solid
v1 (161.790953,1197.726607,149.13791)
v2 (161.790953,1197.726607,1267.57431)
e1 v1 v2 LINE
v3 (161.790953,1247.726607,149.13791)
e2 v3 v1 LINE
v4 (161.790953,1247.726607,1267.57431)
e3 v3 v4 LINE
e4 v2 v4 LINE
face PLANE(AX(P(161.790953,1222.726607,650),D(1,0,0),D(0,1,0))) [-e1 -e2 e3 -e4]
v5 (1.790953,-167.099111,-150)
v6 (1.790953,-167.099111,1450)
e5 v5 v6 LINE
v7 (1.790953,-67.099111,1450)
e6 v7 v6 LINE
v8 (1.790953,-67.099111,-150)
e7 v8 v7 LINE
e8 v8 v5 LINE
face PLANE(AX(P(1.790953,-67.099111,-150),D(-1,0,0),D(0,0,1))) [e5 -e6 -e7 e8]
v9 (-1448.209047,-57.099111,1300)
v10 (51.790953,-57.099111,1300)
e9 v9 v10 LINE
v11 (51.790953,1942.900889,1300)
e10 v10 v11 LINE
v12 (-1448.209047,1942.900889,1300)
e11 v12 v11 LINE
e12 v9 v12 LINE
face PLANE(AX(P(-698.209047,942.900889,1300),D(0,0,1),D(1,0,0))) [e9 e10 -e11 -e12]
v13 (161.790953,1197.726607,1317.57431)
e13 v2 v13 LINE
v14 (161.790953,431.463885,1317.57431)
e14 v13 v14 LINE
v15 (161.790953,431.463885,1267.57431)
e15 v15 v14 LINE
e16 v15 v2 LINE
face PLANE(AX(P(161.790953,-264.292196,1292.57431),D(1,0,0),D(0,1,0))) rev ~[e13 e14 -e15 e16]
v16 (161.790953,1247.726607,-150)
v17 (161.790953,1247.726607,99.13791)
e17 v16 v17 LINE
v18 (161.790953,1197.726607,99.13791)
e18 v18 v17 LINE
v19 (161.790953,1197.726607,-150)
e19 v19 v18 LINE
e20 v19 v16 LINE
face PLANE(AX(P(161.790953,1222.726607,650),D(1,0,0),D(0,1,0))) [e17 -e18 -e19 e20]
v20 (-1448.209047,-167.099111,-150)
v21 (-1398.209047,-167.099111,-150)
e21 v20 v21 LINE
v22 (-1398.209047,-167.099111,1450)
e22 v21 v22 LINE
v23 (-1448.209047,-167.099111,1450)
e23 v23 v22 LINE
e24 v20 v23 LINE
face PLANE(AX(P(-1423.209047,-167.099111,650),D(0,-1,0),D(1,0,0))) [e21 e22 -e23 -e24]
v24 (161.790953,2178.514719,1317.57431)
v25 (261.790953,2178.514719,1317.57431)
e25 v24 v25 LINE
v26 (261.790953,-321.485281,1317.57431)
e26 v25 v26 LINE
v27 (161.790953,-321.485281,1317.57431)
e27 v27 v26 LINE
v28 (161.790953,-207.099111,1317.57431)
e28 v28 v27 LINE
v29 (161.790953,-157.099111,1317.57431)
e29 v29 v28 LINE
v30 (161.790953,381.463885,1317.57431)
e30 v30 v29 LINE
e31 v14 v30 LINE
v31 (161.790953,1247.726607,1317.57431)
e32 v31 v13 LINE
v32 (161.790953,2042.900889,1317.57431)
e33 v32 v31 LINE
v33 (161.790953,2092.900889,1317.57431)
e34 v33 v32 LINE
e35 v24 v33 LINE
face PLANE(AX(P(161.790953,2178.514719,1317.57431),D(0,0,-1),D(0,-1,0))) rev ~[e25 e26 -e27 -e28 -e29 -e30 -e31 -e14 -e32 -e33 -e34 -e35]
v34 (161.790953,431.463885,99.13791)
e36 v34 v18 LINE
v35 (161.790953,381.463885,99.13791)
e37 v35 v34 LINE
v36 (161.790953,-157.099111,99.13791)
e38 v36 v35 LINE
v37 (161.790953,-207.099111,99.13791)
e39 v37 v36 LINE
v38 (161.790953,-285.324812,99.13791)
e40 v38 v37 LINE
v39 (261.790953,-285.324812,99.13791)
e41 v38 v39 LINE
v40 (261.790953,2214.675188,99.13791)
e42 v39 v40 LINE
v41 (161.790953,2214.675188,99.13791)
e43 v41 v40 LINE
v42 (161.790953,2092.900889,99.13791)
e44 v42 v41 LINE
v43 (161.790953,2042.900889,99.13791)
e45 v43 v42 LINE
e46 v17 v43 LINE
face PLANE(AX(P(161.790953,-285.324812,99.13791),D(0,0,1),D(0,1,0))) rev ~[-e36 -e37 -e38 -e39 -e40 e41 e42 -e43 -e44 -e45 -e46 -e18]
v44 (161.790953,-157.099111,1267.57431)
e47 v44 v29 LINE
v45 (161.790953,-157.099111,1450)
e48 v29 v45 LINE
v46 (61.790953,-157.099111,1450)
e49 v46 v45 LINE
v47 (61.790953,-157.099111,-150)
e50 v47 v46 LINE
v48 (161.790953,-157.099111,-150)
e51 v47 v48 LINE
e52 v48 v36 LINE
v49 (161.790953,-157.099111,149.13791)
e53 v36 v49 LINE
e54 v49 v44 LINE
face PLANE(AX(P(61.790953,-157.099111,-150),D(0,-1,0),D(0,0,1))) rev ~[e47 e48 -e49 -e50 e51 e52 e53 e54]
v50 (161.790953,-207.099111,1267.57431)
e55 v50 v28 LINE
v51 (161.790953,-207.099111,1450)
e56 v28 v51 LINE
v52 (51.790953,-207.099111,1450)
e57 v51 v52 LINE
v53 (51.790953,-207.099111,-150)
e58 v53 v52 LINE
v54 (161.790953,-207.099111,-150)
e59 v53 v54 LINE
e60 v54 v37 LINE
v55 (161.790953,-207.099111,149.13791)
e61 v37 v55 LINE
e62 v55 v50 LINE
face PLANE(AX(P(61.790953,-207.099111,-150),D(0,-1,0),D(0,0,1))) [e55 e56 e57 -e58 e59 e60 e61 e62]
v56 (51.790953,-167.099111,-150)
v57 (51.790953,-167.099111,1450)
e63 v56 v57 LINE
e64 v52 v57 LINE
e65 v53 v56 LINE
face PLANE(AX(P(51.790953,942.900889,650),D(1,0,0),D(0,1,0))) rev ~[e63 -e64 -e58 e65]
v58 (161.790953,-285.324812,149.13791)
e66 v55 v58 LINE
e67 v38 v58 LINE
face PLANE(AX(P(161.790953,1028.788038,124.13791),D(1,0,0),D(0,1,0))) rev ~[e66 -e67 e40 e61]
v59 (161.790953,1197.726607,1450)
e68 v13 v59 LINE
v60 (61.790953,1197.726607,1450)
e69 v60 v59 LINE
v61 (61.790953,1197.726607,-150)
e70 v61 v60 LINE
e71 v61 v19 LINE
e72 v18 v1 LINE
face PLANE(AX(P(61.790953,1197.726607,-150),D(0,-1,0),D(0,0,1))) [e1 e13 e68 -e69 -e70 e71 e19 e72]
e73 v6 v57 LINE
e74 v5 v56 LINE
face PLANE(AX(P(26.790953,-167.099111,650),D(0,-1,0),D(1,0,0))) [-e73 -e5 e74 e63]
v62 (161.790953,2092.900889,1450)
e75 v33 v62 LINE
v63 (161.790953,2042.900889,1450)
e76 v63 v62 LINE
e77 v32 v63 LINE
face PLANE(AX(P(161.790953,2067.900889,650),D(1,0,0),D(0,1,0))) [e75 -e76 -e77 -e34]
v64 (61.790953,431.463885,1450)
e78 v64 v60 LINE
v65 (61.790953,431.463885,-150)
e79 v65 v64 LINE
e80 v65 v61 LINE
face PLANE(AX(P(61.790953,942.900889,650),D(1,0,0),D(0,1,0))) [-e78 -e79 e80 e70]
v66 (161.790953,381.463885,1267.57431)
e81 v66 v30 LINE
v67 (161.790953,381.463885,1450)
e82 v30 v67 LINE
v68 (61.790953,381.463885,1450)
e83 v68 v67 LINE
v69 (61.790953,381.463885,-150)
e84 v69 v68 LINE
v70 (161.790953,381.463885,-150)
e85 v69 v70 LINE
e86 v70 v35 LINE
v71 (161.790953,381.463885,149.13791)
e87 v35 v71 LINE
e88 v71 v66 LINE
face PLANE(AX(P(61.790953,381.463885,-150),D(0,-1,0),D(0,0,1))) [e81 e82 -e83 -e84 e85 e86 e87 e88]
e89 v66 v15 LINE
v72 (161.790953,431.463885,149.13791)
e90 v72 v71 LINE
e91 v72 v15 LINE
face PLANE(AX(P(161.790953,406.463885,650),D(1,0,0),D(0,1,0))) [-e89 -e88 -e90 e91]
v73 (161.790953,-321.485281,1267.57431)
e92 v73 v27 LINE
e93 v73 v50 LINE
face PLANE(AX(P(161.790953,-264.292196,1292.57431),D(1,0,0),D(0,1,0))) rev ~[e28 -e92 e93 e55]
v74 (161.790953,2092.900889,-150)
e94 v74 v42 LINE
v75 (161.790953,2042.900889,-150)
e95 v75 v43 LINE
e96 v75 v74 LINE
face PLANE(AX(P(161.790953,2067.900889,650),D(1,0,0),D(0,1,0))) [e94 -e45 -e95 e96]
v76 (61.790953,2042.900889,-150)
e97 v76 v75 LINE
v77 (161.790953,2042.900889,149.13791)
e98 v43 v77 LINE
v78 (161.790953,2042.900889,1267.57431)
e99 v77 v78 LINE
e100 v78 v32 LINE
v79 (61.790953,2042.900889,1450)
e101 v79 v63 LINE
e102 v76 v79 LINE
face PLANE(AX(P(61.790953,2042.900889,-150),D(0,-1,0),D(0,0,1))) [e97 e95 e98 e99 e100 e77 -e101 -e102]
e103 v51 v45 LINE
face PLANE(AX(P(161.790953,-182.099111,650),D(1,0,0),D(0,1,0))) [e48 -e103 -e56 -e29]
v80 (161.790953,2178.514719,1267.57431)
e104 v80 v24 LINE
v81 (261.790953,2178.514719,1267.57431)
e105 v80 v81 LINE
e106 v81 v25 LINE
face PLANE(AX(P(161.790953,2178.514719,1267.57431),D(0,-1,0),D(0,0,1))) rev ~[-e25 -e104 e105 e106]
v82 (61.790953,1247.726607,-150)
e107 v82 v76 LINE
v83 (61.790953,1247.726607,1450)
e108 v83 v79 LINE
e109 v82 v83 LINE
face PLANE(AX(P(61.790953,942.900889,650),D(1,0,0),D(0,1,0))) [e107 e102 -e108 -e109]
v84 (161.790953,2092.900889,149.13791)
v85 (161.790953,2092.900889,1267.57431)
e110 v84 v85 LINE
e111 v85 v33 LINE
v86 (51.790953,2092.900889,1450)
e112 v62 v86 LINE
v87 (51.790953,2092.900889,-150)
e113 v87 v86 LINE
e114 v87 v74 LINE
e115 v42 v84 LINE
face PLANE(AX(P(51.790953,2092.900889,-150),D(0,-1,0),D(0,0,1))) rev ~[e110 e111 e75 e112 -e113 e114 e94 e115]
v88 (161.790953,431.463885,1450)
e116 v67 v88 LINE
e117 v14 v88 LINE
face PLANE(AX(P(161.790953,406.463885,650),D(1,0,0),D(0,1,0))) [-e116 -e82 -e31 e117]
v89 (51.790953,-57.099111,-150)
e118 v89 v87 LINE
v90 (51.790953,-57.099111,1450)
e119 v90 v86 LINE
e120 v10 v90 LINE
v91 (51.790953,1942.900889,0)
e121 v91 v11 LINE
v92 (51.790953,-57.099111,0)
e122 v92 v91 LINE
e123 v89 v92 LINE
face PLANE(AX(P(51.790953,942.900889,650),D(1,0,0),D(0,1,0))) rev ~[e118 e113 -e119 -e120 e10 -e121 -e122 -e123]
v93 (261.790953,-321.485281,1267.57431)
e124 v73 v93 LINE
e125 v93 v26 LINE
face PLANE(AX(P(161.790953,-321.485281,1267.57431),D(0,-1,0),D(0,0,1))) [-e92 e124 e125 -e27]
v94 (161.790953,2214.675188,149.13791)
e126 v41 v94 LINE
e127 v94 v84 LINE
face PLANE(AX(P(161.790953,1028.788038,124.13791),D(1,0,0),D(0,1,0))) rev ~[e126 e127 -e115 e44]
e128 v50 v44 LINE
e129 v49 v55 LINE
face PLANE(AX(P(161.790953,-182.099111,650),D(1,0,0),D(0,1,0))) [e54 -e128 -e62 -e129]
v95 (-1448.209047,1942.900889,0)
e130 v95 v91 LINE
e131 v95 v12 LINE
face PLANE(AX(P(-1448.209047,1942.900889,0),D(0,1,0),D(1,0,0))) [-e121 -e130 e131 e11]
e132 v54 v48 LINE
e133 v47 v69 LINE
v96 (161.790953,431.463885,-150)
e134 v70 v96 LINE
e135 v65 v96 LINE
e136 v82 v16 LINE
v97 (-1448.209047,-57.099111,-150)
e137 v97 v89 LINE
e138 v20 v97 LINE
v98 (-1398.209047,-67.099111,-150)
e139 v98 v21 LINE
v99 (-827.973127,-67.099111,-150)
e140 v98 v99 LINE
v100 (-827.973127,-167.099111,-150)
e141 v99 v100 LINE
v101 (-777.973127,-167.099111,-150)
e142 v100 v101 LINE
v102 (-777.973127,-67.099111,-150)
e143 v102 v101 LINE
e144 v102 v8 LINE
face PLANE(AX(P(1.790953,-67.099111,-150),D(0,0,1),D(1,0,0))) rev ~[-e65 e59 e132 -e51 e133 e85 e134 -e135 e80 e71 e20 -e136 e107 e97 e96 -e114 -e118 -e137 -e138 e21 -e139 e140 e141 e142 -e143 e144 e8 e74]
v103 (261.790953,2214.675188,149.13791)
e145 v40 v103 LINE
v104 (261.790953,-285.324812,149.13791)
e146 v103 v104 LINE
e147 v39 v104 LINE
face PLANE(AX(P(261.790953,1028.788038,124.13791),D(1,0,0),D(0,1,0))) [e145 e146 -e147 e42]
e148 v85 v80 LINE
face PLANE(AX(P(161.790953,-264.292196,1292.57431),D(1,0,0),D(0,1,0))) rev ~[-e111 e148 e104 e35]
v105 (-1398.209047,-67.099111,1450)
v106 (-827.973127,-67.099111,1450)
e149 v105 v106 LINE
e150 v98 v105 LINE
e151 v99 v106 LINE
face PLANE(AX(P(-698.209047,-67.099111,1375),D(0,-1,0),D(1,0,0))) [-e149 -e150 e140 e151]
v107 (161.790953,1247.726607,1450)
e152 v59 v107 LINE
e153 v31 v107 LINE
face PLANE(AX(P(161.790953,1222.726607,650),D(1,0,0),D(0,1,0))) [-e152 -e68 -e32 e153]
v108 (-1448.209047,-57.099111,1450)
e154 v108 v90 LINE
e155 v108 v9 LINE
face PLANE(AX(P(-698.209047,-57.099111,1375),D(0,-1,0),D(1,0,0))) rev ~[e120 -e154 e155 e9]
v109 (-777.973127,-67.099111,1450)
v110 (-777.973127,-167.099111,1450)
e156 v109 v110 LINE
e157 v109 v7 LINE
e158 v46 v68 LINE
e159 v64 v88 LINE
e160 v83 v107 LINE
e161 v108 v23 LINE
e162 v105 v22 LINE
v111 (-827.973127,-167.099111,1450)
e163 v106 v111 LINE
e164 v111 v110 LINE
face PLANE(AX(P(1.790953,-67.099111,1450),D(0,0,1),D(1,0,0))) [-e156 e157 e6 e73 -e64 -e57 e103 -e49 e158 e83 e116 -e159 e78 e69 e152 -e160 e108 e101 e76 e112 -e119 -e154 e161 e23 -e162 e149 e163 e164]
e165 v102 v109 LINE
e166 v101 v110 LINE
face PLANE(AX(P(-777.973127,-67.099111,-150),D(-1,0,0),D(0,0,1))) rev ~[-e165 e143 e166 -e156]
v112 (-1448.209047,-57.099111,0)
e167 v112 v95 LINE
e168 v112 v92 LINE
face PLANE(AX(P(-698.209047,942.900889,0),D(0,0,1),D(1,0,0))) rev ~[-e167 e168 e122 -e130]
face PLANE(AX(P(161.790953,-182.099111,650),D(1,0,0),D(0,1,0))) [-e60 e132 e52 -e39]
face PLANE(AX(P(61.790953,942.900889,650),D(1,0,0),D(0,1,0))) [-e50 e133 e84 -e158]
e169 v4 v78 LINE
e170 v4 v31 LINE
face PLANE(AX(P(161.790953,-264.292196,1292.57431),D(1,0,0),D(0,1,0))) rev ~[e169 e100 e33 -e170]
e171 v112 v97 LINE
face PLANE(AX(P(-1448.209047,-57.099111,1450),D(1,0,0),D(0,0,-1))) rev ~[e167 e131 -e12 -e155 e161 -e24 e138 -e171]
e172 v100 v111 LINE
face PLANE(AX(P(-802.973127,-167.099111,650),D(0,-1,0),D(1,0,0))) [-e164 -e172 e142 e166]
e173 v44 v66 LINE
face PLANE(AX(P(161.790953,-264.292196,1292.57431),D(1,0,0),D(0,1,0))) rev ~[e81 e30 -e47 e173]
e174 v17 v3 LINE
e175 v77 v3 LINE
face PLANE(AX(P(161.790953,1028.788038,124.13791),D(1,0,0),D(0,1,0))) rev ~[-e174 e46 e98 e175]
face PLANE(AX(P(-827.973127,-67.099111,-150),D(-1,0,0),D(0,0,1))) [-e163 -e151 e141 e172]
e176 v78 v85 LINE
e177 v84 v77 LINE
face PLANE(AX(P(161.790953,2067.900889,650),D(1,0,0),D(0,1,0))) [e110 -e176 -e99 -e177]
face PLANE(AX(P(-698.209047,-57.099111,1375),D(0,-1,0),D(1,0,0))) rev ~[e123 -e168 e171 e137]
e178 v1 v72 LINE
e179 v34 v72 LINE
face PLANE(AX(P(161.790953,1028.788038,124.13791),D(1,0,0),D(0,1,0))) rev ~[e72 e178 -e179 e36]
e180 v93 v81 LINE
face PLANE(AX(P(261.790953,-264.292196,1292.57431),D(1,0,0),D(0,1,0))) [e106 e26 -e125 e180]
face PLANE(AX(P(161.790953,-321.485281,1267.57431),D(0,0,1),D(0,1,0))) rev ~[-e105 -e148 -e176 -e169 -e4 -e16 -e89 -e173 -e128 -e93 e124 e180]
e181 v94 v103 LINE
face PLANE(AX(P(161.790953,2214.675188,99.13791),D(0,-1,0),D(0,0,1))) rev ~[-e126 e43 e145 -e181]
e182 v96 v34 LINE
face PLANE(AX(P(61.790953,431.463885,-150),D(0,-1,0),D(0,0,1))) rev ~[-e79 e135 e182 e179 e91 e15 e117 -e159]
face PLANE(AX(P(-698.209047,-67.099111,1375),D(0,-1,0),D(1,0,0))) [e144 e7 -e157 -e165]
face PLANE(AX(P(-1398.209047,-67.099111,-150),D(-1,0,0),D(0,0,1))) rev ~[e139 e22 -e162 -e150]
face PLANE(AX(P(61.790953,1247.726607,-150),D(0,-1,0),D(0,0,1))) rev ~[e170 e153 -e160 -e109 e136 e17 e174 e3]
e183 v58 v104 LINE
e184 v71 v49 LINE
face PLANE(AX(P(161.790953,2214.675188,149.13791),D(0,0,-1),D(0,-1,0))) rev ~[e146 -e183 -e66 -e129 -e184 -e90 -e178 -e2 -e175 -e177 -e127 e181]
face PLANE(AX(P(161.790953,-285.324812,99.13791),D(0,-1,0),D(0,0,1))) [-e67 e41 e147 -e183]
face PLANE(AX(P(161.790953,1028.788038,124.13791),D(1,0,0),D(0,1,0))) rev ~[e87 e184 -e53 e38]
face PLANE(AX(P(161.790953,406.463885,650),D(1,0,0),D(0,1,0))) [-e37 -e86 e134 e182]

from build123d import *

# Parameters (mm, degrees)
F0_W      = 1500
F0_H      = 2000
F1_DEPTH  = 1300
F2_W      = 2300
F2_H      = 1600
F2_W_2    = 2000
F2_H_2    = 1300
F3_DEPTH  = 10
F4_W      = 50
F4_H      = 1600
F5_DEPTH  = 100
F6_W      = 114.3861696124
F6_H      = 50
F6_W_2    = 50
F6_W_3    = 2335.6138303876
F6_W_4    = 2371.7742994428
F6_W_5    = 78.2257005572
F7_DEPTH  = 100
F8_W      = 1500
F8_H      = 150
F8_H_2    = 1300
F9_DEPTH  = 10
F10_W     = 50
F10_H     = 1600
F11_DEPTH = 100


with BuildPart() as f1:
    # F0 (on Top) → F1 (new body)
    with BuildSketch(Plane.XY):
        with Locations((-698.2090473175, 942.9008886218)):
            Rectangle(F0_W, F0_H)
    extrude(amount=F1_DEPTH)

    # F2 (on face) → F3 (join)
    with BuildSketch(Plane.YZ.offset(51.7909526825)):
        with Locations((942.9008886218, 650)):
            Rectangle(F2_W, F2_H)
        with Locations((942.9008886218, 650)):
            Rectangle(F2_W_2, F2_H_2, mode=Mode.SUBTRACT)
        with Locations((942.9008886218, 650)):
            Rectangle(F2_W_2, F2_H_2)
    extrude(amount=F3_DEPTH)

    # F4 (on face) → F5 (join)
    with BuildSketch(Plane.YZ.offset(61.7909526825)):
        with Locations((-182.0991113782, 650)):
            Rectangle(F4_W, F4_H)
        with Locations((406.4638853073, 650)):
            Rectangle(F4_W, F4_H)
        with Locations((1222.7266073227, 650)):
            Rectangle(F4_W, F4_H)
        with Locations((2067.9008886218, 650)):
            Rectangle(F4_W, F4_H)
    extrude(amount=F5_DEPTH)

    # F6 (on face) → F7 (join)
    with BuildSketch(Plane.YZ.offset(161.7909526825)):
        with Locations((-264.2921961844, 1292.5743103027)):
            Rectangle(F6_W, F6_H)
        with Locations((-182.0991113782, 1292.5743103027)):
            Rectangle(F6_W_2, F6_H)
        with Locations((1010.7078038156, 1292.5743103027)):
            Rectangle(F6_W_3, F6_H)
        with Locations((1028.7880383432, 124.1379097104)):
            Rectangle(F6_W_4, F6_H)
        with Locations((-182.0991113782, 124.1379097104)):
            Rectangle(F6_W_2, F6_H)
        with Locations((-246.2119616568, 124.1379097104)):
            Rectangle(F6_W_5, F6_H)
    extrude(amount=F7_DEPTH)

    # F8 (on face) → F9 (join)
    with BuildSketch(Plane.XZ.offset(57.0991113782)):
        with Locations((-698.2090473175, 1375)):
            Rectangle(F8_W, F8_H)
        with Locations((-698.2090473175, 650)):
            Rectangle(F8_W, F8_H_2)
        with Locations((-698.2090473175, -75)):
            Rectangle(F8_W, F8_H)
    extrude(amount=F9_DEPTH)

    # F10 (on face) → F11 (join)
    with BuildSketch(Plane.XZ.offset(67.0991113782)):
        with Locations((26.7909526825, 650)):
            Rectangle(F10_W, F10_H)
        with Locations((-802.9731273651, 650)):
            Rectangle(F10_W, F10_H)
        with Locations((-1423.2090473175, 650)):
            Rectangle(F10_W, F10_H)
    extrude(amount=F11_DEPTH)


solid = f1.part
